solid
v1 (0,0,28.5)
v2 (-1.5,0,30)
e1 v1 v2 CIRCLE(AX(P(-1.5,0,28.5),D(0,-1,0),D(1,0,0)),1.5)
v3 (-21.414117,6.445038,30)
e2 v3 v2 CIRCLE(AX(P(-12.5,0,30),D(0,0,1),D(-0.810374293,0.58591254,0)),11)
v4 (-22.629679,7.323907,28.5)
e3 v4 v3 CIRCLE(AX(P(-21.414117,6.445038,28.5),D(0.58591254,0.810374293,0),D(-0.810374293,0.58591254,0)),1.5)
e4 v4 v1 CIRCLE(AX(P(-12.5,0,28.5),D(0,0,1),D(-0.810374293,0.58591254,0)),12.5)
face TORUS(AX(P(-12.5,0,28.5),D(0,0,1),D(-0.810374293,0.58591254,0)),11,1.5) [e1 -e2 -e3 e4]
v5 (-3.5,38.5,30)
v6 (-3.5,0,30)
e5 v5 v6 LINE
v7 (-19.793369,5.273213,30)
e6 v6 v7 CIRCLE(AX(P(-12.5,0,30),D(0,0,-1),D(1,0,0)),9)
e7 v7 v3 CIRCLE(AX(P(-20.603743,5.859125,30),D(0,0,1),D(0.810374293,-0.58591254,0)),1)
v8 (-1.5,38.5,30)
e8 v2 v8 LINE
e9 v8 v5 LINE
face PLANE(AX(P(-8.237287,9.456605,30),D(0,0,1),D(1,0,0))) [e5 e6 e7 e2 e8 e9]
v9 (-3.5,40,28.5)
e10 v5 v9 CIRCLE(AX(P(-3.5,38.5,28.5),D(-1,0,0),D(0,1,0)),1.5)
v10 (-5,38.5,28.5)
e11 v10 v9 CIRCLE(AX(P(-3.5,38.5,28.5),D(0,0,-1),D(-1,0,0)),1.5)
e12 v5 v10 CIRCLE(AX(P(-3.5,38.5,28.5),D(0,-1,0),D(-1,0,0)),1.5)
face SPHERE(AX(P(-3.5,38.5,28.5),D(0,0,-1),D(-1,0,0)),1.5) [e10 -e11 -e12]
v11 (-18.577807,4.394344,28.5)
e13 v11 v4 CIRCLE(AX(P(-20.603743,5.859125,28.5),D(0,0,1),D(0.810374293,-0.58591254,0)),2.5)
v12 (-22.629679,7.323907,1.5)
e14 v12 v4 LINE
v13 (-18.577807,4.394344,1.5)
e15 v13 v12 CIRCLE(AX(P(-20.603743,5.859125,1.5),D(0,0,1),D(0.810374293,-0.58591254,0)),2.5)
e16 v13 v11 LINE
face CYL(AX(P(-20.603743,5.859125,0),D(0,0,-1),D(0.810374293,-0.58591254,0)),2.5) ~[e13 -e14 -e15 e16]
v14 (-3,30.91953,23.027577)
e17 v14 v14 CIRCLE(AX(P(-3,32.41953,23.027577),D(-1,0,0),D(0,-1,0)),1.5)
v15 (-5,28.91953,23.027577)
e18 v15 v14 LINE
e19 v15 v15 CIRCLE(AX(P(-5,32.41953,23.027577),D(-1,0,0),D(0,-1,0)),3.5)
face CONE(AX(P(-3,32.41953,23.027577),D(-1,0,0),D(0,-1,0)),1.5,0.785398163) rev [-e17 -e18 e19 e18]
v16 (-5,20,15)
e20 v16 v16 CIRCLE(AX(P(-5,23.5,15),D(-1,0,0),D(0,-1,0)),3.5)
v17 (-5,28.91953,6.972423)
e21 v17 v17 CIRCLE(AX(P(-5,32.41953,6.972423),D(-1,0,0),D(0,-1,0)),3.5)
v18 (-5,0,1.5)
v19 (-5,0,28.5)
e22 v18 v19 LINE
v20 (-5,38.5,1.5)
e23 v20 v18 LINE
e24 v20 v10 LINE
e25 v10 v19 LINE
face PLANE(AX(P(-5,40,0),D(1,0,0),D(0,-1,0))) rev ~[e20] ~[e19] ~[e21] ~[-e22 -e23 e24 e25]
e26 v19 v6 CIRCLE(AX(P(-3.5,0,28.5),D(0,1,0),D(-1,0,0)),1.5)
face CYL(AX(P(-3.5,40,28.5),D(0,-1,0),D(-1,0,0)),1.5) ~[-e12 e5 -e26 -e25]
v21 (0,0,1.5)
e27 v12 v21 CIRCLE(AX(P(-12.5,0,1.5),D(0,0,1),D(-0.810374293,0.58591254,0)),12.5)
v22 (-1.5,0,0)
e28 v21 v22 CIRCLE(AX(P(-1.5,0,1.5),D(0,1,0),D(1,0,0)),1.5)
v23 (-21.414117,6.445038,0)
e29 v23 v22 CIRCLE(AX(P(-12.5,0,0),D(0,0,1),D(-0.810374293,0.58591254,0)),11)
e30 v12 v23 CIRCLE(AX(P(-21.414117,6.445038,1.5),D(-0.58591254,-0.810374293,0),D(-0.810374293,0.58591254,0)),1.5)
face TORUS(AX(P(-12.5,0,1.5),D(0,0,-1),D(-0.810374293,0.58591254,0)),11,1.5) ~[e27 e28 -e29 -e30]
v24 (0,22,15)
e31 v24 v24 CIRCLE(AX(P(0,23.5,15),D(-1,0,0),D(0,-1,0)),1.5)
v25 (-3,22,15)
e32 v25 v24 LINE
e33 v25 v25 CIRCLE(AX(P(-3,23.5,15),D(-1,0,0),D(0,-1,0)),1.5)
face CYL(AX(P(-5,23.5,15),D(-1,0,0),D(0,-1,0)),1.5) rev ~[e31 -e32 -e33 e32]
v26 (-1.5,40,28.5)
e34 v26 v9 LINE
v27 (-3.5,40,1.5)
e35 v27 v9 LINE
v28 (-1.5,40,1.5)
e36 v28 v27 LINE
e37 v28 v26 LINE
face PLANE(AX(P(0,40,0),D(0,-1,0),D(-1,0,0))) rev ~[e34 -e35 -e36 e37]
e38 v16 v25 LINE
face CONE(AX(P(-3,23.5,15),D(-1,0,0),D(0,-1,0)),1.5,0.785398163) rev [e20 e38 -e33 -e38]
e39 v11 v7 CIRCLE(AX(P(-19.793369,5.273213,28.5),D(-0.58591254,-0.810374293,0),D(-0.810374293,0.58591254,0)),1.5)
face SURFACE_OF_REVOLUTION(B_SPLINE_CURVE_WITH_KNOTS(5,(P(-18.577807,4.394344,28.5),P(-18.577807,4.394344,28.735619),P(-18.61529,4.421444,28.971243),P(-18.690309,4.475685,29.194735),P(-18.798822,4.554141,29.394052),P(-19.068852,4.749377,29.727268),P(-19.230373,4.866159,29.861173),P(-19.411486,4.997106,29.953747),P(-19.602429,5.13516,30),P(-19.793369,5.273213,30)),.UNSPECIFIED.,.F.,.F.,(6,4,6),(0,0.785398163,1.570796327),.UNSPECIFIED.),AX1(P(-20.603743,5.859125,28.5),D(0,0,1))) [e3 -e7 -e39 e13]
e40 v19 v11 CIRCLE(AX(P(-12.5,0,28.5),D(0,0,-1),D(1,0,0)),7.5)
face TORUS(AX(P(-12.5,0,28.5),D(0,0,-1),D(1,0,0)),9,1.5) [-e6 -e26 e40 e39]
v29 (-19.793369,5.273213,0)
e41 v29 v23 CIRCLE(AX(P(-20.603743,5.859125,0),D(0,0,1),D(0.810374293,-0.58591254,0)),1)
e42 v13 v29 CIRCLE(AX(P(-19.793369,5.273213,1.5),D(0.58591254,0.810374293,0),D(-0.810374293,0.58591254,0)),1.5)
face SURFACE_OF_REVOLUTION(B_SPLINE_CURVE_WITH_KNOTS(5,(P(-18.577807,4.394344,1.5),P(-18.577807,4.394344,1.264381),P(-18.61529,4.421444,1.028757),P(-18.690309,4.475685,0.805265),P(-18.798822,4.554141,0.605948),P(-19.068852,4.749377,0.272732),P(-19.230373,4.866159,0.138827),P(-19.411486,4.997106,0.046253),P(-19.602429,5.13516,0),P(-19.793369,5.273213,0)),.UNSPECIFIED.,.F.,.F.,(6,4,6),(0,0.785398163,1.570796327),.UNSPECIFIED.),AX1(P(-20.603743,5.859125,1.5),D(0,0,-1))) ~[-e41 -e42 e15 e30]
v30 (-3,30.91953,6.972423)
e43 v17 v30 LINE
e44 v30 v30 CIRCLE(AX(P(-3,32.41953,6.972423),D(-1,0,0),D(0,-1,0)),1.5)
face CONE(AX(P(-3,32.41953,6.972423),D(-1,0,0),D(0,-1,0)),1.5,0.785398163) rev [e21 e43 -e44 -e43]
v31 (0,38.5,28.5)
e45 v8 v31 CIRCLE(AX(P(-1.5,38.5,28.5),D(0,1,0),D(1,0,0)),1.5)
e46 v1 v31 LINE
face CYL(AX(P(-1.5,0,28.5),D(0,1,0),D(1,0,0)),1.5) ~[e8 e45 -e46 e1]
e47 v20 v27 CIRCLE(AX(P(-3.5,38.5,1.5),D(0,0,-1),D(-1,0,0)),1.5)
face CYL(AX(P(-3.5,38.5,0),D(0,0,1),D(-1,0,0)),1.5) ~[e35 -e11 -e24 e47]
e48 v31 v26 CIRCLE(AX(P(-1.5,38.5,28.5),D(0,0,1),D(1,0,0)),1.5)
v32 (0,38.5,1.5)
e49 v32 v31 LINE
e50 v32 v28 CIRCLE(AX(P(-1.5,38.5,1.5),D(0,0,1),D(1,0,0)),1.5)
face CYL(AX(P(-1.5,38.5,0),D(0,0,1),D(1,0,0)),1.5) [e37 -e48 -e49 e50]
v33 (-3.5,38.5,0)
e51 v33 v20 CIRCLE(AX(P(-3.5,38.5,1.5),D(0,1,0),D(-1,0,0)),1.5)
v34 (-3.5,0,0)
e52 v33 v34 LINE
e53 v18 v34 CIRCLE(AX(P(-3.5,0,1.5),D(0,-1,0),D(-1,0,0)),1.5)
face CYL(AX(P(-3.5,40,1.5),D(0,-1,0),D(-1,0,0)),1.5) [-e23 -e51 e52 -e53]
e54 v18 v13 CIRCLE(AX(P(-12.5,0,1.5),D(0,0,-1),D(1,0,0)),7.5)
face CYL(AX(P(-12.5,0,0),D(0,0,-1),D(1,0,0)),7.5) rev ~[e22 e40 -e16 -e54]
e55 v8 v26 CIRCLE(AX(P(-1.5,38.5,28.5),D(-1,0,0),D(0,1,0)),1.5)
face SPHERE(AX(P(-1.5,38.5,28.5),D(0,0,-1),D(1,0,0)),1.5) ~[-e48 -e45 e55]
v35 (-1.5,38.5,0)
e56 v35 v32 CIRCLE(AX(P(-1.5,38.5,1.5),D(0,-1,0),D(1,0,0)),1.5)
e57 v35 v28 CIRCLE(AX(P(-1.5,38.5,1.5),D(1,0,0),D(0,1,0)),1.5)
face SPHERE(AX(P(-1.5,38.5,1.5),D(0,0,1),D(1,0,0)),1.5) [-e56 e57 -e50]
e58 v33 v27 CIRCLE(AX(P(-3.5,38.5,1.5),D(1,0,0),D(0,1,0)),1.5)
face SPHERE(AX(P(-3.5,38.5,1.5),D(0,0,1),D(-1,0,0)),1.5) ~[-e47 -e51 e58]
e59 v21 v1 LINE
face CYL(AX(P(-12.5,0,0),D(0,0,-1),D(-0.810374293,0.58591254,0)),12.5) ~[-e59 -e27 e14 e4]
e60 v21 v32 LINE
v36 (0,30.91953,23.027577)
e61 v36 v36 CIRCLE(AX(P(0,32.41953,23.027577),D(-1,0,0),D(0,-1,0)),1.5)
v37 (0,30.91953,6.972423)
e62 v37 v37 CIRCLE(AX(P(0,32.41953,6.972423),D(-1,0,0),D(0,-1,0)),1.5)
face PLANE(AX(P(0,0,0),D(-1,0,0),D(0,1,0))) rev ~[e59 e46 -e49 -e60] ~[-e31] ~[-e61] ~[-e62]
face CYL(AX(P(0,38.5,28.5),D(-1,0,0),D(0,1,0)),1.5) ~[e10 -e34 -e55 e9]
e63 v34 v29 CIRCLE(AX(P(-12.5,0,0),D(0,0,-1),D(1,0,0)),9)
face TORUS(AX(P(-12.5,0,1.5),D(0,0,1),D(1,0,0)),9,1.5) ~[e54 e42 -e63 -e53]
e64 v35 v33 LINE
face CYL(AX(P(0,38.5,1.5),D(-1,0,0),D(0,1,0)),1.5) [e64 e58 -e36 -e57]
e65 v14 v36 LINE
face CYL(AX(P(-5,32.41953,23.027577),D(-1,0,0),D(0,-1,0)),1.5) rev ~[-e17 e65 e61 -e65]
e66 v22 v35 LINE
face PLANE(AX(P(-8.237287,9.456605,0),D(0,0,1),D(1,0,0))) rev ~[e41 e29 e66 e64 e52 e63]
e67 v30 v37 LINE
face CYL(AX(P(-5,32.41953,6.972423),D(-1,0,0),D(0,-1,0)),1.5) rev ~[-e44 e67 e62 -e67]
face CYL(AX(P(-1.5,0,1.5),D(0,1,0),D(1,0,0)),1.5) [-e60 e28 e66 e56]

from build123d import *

# Parameters (mm, degrees)
F1_DEPTH      = 30
F2_R          = 1.5
F3_R          = 1.5
F4_DEPTH      = 25
F4_DEPTH_BACK = 25
F5_SIZE       = 2


# Not quite as in the source:
# - a feature names something its author has since deleted; it is built from what else it names


with BuildPart() as f1:
    # F0 (on Top) → F1 (new body)
    with BuildSketch(Plane.XY):
        with BuildLine():
            Line((-5, 40), (-5, 0))
            ThreePointArc((-5, 0), (-14.8093771881, -7.1355992743), (-18.5778072009, 4.3943440499))
            ThreePointArc((-18.5778072009, 4.3943440499), (-19.1389615845, 7.8850611335), (-22.6296786681, 7.3239067498))
            ThreePointArc((-22.6296786681, 7.3239067498), (-16.3489619801, -11.8926654572), (0, 0))
            Line((0, 0), (0, 40))
            Line((0, 40), (-5, 40))
        make_face()
    extrude(amount=F1_DEPTH)

    # F2
    f2_edges = [f1.edges().sort_by_distance(p)[0] for p in [
        (-5, 40, 15),
        (0, 40, 15),
        (-16.348962, -11.892665, 0),
        (-16.348962, -11.892665, 30),
        (0, 20, 0),
        (-14.809377, -7.135599, 0),
        (-14.809377, -7.135599, 30),
        (-5, 20, 0),
        (-18.577807, 4.394344, 15),
        (-5, 20, 30),
        (-2.5, 40, 0),
        (0, 0, 15),
        (-22.629679, 7.323907, 15),
        (-2.5, 40, 30),
        (0, 20, 30),
        (-19.138962, 7.885061, 0),
        (-19.138962, 7.885061, 30),
    ]]
    fillet(f2_edges, radius=F2_R)

    # F3 (on face) → F4 (cut, two sides)
    with BuildSketch(Plane(origin=(-5, 0, 0), x_dir=(0, -1, 0), z_dir=(-1, 0, 0))) as f4_sk:
        with Locations((-23.5, 15)):
            Circle(F3_R)
        with Locations((-32.419529755, 23.0275767795)):
            Circle(F3_R)
        with Locations((-32.419529755, 6.9724232205)):
            Circle(F3_R)
    extrude(amount=F4_DEPTH, mode=Mode.SUBTRACT)
    extrude(f4_sk.sketch, amount=-F4_DEPTH_BACK, mode=Mode.SUBTRACT)

    # F5
    f5_edges = [f1.edges().sort_by_distance(p)[0] for p in [
        (-5, 33.91953, 6.972423),
        (-5, 33.91953, 23.027577),
        (-5, 25, 15),
    ]]
    chamfer(f5_edges, length=F5_SIZE)


solid = f1.part
